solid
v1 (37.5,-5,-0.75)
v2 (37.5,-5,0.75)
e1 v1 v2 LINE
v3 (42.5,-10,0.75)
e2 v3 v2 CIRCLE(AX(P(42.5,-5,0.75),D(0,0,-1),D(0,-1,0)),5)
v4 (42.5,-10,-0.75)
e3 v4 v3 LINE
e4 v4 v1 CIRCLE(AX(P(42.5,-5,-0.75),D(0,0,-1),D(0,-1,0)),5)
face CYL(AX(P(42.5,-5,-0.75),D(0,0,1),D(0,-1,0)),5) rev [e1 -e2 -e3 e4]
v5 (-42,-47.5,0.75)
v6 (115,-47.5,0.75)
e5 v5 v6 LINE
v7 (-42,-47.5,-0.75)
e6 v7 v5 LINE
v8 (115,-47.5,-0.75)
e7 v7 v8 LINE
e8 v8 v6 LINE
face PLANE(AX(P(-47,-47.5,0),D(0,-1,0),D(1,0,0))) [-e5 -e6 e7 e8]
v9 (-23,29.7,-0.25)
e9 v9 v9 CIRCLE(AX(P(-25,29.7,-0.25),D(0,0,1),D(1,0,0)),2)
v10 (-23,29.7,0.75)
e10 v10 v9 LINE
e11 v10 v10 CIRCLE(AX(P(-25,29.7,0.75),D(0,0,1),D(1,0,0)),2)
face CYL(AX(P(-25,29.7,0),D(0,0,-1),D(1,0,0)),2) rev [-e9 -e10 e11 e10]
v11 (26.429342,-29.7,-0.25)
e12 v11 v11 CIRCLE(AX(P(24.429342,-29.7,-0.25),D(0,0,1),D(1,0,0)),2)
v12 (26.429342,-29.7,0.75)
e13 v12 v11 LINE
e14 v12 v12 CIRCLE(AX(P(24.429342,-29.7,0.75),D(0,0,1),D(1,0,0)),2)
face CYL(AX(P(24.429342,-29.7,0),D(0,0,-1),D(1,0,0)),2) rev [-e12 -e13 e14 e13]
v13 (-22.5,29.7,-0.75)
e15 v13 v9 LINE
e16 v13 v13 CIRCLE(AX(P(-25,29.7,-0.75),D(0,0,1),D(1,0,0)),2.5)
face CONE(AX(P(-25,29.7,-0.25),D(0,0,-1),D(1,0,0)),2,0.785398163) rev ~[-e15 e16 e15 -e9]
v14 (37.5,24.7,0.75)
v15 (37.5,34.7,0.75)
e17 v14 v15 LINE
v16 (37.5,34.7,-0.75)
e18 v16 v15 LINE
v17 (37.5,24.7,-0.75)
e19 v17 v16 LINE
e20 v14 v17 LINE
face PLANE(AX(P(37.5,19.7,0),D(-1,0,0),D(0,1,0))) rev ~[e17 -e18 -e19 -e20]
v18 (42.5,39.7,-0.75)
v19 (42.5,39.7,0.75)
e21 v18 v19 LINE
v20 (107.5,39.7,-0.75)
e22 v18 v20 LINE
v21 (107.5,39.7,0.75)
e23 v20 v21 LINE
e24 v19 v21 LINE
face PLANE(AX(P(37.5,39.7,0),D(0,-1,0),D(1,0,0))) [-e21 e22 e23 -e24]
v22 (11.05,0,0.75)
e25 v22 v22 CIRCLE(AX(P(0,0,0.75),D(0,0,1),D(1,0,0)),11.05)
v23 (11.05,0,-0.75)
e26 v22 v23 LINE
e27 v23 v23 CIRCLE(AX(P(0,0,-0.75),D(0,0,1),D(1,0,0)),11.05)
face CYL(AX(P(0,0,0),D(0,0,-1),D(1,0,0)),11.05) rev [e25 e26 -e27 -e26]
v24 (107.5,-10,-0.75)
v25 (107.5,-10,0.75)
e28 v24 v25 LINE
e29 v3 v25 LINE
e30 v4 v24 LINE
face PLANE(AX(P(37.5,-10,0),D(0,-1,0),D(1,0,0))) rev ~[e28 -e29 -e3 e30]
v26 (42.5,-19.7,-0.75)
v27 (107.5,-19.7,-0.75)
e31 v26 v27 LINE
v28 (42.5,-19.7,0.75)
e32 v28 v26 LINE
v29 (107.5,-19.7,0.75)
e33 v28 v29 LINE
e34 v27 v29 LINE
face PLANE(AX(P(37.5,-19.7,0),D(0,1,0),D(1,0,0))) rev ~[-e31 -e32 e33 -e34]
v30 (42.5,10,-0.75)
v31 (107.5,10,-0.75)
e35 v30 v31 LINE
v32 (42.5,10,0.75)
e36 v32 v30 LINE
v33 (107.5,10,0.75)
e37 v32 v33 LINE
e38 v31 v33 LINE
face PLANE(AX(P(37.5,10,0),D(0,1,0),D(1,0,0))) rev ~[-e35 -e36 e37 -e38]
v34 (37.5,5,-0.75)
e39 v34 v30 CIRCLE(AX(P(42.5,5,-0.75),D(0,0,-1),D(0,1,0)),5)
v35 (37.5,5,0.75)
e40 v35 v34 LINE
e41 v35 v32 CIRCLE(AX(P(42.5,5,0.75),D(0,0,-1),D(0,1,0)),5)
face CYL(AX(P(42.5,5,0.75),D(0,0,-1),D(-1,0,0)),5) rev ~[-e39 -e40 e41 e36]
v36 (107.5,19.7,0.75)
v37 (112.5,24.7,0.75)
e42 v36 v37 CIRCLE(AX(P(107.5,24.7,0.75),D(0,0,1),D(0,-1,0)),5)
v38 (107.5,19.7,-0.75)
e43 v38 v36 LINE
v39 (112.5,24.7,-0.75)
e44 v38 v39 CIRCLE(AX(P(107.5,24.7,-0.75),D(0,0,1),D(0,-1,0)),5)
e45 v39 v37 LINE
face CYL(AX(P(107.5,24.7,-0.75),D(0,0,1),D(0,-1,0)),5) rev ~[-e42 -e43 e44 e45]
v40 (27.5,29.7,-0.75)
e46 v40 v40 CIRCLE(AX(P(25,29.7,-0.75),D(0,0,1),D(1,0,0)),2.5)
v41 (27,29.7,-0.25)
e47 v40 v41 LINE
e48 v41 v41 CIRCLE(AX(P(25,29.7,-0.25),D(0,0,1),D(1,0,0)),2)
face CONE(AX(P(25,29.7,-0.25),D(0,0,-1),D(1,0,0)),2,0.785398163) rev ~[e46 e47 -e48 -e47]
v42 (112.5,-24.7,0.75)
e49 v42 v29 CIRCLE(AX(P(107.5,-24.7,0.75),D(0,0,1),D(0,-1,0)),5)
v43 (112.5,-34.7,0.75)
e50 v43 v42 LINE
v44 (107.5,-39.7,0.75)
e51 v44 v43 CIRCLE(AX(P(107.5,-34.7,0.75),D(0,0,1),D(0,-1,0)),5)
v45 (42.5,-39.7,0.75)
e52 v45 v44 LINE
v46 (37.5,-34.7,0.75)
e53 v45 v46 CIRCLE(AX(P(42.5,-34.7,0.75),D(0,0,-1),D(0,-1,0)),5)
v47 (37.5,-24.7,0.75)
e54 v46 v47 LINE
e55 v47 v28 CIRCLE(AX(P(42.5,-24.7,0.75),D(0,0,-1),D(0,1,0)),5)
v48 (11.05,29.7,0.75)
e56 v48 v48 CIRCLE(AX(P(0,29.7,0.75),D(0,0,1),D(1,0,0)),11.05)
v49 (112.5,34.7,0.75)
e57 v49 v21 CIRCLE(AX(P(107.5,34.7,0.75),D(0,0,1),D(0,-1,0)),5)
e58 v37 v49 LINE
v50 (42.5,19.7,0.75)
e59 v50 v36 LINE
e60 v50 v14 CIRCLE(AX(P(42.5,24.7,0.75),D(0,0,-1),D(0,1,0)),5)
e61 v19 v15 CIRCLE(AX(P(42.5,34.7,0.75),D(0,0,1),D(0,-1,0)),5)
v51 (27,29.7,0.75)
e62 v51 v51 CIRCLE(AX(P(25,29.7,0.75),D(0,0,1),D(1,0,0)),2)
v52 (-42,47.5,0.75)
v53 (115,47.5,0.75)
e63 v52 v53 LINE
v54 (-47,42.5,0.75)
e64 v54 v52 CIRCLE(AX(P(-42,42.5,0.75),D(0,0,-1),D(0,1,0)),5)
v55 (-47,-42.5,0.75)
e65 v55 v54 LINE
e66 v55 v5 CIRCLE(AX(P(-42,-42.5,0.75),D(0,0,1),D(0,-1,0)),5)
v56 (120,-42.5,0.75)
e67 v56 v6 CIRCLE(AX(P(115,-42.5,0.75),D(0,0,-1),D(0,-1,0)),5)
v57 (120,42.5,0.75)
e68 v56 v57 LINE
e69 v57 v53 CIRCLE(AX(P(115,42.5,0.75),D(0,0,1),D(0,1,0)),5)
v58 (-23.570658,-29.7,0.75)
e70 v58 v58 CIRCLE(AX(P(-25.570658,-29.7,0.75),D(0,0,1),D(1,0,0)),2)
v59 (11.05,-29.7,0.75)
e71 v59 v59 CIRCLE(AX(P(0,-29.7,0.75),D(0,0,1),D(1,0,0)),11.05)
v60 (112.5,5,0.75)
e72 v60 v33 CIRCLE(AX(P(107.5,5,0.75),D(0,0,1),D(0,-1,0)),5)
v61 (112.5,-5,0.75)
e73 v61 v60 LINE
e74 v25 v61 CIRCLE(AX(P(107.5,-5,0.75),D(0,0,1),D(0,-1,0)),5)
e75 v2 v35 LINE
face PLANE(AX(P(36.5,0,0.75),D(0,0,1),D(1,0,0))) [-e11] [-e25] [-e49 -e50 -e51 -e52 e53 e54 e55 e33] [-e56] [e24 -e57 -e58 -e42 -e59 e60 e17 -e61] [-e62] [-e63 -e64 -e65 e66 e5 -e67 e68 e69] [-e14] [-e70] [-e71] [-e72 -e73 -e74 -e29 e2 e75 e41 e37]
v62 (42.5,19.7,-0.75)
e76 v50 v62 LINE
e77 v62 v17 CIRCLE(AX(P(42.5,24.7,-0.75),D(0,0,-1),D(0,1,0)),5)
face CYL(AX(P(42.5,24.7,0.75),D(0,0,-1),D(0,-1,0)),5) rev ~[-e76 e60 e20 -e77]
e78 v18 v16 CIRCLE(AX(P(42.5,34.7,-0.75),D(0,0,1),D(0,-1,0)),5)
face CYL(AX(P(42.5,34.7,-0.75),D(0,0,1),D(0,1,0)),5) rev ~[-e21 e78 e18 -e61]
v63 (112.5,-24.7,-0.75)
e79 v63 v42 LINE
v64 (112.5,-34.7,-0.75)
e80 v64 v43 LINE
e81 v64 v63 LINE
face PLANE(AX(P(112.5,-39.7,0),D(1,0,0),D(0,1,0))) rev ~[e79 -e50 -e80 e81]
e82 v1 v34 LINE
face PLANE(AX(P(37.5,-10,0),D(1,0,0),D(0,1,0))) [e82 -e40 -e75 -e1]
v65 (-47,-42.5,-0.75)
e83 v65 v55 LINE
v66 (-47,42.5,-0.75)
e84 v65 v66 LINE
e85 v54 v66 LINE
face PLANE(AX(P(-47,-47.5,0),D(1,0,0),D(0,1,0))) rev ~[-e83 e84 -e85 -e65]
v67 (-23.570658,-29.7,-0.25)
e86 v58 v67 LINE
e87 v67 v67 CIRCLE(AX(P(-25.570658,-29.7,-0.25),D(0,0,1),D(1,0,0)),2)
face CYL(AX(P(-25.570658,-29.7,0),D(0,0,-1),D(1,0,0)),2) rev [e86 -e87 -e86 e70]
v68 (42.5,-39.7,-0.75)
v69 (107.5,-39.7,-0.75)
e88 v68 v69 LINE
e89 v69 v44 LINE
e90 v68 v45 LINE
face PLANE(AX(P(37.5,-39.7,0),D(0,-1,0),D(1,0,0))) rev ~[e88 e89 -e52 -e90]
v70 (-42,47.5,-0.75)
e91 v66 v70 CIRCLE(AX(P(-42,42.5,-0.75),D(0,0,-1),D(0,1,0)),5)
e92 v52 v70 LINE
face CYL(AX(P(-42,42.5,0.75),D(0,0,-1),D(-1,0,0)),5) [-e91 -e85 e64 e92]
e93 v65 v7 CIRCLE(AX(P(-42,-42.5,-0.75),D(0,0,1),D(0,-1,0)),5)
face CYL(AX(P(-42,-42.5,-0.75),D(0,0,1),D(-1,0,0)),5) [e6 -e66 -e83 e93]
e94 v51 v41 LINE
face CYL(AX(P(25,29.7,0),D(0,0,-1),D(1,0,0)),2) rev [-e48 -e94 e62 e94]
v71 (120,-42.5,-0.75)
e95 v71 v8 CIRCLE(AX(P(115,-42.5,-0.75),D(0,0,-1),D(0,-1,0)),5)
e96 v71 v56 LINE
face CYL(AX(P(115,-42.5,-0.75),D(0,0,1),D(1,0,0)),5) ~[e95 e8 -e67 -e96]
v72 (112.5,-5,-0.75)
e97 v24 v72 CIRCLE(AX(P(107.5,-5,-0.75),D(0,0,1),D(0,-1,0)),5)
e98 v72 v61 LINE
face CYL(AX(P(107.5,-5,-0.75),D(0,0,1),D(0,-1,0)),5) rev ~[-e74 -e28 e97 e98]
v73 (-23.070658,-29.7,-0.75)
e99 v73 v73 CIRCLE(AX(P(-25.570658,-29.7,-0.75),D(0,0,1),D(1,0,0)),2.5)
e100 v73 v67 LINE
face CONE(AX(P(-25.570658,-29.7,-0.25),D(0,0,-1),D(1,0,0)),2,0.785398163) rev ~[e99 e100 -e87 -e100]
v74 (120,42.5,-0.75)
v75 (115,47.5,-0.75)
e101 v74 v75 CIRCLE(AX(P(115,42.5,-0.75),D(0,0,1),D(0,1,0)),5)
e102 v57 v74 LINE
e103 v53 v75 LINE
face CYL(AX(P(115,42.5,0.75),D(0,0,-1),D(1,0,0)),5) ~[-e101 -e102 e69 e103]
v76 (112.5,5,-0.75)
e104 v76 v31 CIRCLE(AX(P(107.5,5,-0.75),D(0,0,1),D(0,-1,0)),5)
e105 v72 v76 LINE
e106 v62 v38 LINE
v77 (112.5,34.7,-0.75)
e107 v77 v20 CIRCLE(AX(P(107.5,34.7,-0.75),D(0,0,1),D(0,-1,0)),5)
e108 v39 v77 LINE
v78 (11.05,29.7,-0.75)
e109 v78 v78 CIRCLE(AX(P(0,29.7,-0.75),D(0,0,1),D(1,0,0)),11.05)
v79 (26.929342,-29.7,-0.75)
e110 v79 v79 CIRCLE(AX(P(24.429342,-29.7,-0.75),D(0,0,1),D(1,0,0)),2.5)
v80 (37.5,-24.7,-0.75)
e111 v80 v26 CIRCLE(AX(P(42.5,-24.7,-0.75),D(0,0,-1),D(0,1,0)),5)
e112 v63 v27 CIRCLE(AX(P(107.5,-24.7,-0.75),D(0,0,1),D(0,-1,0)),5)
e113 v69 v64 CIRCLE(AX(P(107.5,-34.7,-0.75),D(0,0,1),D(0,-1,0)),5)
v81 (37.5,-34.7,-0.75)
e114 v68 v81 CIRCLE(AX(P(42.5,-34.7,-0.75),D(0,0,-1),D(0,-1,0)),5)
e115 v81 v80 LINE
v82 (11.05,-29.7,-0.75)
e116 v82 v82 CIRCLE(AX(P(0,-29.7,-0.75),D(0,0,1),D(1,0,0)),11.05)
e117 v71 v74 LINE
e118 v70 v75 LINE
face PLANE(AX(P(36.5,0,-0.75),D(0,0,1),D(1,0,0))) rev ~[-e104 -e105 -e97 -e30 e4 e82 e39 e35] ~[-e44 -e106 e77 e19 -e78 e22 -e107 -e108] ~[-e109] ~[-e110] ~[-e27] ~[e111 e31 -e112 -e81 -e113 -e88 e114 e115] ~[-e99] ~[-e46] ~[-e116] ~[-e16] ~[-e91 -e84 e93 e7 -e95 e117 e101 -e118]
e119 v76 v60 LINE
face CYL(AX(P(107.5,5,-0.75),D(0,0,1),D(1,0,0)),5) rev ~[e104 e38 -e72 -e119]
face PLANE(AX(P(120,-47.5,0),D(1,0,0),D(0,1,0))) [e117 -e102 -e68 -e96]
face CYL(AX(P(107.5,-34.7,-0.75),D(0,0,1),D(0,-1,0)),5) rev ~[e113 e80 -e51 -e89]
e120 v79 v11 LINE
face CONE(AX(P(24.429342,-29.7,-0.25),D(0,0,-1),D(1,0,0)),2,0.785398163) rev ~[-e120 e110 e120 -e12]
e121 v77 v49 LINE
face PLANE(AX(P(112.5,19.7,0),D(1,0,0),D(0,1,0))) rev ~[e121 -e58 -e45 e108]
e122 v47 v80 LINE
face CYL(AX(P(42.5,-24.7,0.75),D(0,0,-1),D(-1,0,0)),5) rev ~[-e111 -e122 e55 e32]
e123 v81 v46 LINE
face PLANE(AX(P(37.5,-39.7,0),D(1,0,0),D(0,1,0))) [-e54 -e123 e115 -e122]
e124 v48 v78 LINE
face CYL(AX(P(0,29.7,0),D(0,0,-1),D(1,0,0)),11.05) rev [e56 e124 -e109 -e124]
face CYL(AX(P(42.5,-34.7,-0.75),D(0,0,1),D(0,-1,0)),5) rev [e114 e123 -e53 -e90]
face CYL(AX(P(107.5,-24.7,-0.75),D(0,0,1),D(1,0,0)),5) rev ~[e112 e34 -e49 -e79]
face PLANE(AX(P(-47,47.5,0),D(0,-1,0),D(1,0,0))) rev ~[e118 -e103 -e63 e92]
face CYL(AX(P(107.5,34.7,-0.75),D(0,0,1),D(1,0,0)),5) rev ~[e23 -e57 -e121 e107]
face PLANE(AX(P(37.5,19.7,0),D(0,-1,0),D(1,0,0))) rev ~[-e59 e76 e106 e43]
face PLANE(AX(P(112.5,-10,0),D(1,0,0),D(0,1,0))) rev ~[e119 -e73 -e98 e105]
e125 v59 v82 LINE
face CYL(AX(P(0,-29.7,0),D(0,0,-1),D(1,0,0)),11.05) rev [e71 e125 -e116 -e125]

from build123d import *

# Parameters (mm, degrees)
F0_W     = 167
F0_H     = 95
F0_R     = 2
F0_R_2   = 11.05
F0_W_2   = 75
F0_H_2   = 20
F1_DEPTH = 0.75
F2_R     = 5
F3_R     = 5
F4_SIZE  = 0.5


# Not quite as in the source:
# - a feature names something its author has since deleted; it is built from what else it names


with BuildPart() as f1:
    # F0 (on Top) → F1 (new body, symmetric)
    with BuildSketch(Plane.XY):
        with Locations((36.5, 0)):
            Rectangle(F0_W, F0_H)
        with Locations((-25.5706578493, -29.7)):
            Circle(F0_R, mode=Mode.SUBTRACT)
        with Locations((0, -29.7)):
            Circle(F0_R_2, mode=Mode.SUBTRACT)
        with Locations((24.4293421507, -29.7)):
            Circle(F0_R, mode=Mode.SUBTRACT)
        with Locations((75, -29.7)):
            Rectangle(F0_W_2, F0_H_2, mode=Mode.SUBTRACT)
        Circle(F0_R_2, mode=Mode.SUBTRACT)
        with Locations((-25, 29.7)):
            Circle(F0_R, mode=Mode.SUBTRACT)
        with Locations((0, 29.7)):
            Circle(F0_R_2, mode=Mode.SUBTRACT)
        with Locations((25, 29.7)):
            Circle(F0_R, mode=Mode.SUBTRACT)
        with Locations((75, 0)):
            Rectangle(F0_W_2, F0_H_2, mode=Mode.SUBTRACT)
        with Locations((75, 29.7)):
            Rectangle(F0_W_2, F0_H_2, mode=Mode.SUBTRACT)
    extrude(amount=F1_DEPTH, both=True)

    # F2
    f2_edges = [f1.edges().sort_by_distance(p)[0] for p in [
        (120, 47.5, 0),
        (120, -47.5, 0),
        (-47, -47.5, 0),
        (-47, 47.5, 0),
    ]]
    fillet(f2_edges, radius=F2_R)

    # F3
    f3_edges = [f1.edges().sort_by_distance(p)[0] for p in [
        (37.5, 39.7, 0),
        (37.5, 10, 0),
        (37.5, -19.7, 0),
        (112.5, 39.7, 0),
        (112.5, 10, 0),
        (112.5, -19.7, 0),
        (112.5, -39.7, 0),
        (112.5, -10, 0),
        (112.5, 19.7, 0),
        (37.5, -39.7, 0),
        (37.5, -10, 0),
        (37.5, 19.7, 0),
    ]]
    fillet(f3_edges, radius=F3_R)

    # F4
    f4_edges = [f1.edges().sort_by_distance(p)[0] for p in [
        (-27.570658, -29.7, -0.75),
        (22.429342, -29.7, -0.75),
        (23, 29.7, -0.75),
        (-27, 29.7, -0.75),
    ]]
    chamfer(f4_edges, length=F4_SIZE)


solid = f1.part
